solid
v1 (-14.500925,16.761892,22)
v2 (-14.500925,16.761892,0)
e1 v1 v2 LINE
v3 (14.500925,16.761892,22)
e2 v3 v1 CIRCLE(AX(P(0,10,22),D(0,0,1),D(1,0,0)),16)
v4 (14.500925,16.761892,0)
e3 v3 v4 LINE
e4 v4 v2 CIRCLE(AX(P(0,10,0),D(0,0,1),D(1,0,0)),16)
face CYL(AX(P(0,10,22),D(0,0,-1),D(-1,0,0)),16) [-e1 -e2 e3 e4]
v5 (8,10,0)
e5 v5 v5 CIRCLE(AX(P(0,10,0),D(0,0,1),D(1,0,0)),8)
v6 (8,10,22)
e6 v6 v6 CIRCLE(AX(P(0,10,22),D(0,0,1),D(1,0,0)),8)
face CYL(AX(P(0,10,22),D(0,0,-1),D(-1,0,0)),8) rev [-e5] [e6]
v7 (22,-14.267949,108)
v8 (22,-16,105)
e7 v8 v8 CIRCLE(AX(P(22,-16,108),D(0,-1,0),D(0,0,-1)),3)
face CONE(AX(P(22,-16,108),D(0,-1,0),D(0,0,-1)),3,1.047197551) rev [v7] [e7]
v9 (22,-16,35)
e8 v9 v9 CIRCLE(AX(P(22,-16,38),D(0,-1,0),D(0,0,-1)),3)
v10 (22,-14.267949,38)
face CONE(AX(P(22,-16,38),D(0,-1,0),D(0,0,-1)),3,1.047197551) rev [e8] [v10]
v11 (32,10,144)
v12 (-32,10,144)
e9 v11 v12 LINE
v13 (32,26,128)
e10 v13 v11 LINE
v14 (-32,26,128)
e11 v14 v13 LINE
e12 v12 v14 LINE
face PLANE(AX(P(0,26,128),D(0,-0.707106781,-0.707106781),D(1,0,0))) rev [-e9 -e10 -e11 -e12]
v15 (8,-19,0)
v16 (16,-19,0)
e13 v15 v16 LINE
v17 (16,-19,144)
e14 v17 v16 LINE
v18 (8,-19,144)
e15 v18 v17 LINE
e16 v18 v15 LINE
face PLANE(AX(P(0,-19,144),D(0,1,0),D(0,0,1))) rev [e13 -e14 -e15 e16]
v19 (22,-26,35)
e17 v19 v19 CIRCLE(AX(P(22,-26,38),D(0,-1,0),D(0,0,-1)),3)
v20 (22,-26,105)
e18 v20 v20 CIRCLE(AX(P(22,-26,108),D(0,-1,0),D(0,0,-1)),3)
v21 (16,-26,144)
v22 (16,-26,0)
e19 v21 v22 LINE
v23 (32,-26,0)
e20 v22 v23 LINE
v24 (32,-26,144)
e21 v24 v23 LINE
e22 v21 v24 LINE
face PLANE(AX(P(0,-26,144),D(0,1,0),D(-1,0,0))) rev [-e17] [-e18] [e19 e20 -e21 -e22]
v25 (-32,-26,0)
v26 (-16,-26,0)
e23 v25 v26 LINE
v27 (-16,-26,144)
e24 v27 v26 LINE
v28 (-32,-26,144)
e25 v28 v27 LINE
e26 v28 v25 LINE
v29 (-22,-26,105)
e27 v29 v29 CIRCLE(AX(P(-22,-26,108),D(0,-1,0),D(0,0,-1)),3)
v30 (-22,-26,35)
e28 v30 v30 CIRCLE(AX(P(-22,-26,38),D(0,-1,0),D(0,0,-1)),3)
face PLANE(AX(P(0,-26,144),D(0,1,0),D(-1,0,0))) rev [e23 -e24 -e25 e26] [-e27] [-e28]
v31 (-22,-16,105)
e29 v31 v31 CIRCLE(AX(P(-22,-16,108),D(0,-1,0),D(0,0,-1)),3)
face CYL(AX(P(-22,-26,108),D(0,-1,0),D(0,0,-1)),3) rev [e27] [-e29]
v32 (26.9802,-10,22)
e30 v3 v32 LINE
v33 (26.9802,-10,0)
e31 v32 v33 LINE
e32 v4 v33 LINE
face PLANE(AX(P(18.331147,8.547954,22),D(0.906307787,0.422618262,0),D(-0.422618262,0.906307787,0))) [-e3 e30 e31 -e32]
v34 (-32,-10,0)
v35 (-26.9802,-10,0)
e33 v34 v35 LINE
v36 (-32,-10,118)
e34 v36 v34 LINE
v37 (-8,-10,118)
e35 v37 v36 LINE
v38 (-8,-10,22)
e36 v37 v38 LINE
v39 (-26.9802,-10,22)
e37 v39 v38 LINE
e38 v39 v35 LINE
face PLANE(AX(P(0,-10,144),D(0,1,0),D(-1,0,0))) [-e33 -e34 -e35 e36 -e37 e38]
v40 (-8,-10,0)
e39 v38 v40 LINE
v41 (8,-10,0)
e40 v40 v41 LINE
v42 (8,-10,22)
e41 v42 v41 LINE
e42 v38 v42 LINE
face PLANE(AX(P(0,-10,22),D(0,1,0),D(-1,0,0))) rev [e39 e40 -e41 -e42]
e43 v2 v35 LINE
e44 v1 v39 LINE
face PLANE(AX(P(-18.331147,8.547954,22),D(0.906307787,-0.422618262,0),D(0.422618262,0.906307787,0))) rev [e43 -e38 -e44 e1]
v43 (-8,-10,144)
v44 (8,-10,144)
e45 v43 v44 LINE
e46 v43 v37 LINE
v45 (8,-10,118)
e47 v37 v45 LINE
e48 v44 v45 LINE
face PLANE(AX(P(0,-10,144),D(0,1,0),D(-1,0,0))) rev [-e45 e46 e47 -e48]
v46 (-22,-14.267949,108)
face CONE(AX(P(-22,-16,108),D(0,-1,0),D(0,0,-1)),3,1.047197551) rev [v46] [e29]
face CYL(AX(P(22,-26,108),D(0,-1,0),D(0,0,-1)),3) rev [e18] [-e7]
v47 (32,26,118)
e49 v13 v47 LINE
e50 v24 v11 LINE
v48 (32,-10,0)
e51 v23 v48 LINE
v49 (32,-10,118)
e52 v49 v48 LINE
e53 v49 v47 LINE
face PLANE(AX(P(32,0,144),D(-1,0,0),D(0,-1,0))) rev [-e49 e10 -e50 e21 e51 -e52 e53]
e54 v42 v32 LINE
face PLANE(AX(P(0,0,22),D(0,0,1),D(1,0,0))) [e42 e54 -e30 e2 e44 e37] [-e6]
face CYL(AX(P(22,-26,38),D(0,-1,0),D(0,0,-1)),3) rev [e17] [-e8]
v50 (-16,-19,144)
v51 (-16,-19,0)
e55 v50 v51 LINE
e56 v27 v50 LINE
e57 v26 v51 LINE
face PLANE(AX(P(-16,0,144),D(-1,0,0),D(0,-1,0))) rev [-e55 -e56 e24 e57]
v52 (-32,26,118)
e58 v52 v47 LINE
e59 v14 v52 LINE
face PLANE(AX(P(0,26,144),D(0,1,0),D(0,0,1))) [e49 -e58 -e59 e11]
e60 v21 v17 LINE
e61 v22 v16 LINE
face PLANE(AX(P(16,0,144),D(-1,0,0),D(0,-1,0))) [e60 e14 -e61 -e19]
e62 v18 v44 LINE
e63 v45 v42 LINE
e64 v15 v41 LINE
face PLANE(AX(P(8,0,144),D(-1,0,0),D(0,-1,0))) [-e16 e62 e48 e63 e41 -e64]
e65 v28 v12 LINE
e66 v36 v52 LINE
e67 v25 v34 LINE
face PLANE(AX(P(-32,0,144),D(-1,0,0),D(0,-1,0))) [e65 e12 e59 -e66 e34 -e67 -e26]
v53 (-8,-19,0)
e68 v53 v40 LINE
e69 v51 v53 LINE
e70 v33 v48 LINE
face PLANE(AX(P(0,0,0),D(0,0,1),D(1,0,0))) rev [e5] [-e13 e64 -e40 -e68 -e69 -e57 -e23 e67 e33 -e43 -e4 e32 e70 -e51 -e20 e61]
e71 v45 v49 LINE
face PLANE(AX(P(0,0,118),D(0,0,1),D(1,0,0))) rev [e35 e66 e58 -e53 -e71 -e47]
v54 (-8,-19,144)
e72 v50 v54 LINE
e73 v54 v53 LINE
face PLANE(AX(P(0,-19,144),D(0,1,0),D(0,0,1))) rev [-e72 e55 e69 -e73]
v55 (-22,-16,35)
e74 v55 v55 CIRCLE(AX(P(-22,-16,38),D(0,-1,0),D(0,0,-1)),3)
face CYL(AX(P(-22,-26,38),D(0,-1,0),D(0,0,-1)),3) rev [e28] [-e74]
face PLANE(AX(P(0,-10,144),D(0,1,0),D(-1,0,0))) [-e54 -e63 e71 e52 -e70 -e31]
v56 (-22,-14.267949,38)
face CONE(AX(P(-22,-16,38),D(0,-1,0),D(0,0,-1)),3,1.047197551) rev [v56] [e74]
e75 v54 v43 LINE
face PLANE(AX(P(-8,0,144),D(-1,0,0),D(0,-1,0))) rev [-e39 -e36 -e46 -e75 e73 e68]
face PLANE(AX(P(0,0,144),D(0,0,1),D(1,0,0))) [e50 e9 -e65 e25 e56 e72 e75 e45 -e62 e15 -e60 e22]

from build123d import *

# Parameters (mm, degrees)
BOSS_EXTRUDE2_DEPTH   = 144
BOSS_EXTRUDE2_2_DEPTH = 144
BOSS_EXTRUDE3_START   = 118
BOSS_EXTRUDE3_DEPTH   = 26
BOSS_EXTRUDE4_DEPTH   = 22
CHAMFER1_SIZE         = 16


# Read off the part's stored shape, not the designer's step: Ø2.0 (6) Diameter Hole1
with BuildPart() as part:
    # Sketch1 → Boss-Extrude2 (new body)
    with BuildSketch(Plane.XY):
        Polygon((26.980199866, -10), (8, -10), (8, -19), (16, -19), (16, -26), (32, -26), (32, -10), align=None)
    extrude(amount=BOSS_EXTRUDE2_DEPTH)



with BuildPart() as body_2:
    # Sketch1 → Boss-Extrude2 2 (new body)
    with BuildSketch(Plane.XY):
        Polygon((-32, -10), (-32, -26), (-16, -26), (-16, -19), (-8, -19), (-8, -10), (-26.980199866, -10), align=None)
    extrude(amount=BOSS_EXTRUDE2_2_DEPTH)


with BuildPart() as part_1:
    add(part.part)

    add(body_2.part)  # Boss-Extrude3 merges body 2
    # Sketch1<5> → Boss-Extrude3 (add)
    with BuildSketch(Plane.XY.offset(BOSS_EXTRUDE3_START)):
        Polygon((17.654046703, 10), (26.980199866, -10), (32, -10), (32, 10), align=None)
        with BuildLine():
            Line((32, 26), (-2.1e-08, 26))
            ThreePointArc((-2.1e-08, 26), (8.596793725, 23.494263139), (14.500924593, 16.761892188))
            Line((14.500924593, 16.761892188), (17.654046703, 10))
            Line((17.654046703, 10), (32, 10))
            Line((32, 10), (32, 26))
        make_face()
        with BuildLine():
            Line((-32, 26), (-32, 10))
            Line((-32, 10), (-17.654046703, 10))
            Line((-17.654046703, 10), (-14.500924593, 16.761892188))
            ThreePointArc((-14.500924593, 16.761892188), (-8.596793742, 23.494263127), (-2.1e-08, 26))
            Line((-2.1e-08, 26), (-32, 26))
        make_face()
        with BuildLine():
            Line((-14.500924593, 16.761892188), (-17.654046703, 10))
            Line((-17.654046703, 10), (-8, 10))
            ThreePointArc((-8, 10), (0, 18), (8, 10))
            Line((8, 10), (17.654046703, 10))
            Line((17.654046703, 10), (14.500924593, 16.761892188))
            ThreePointArc((14.500924593, 16.761892188), (8.596793725, 23.494263139), (-2.1e-08, 26))
            ThreePointArc((-2.1e-08, 26), (-8.596793742, 23.494263127), (-14.500924593, 16.761892188))
        make_face()
        with BuildLine():
            Line((-17.654046703, 10), (-26.980199866, -10))
            Line((-26.980199866, -10), (-8, -10))
            Line((-8, -10), (8, -10))
            Line((8, -10), (26.980199866, -10))
            Line((26.980199866, -10), (17.654046703, 10))
            Line((17.654046703, 10), (8, 10))
            ThreePointArc((8, 10), (0, 2), (-8, 10))
            Line((-8, 10), (-17.654046703, 10))
        make_face()
        with BuildLine():
            ThreePointArc((8, 10), (0, 18), (-8, 10))
            Line((-8, 10), (8, 10))
        make_face()
        with BuildLine():
            Line((8, 10), (-8, 10))
            ThreePointArc((-8, 10), (0, 2), (8, 10))
        make_face()
        Polygon((-32, 10), (-32, -10), (-26.980199866, -10), (-17.654046703, 10), align=None)
        Polygon((-32, -10), (-32, -26), (-16, -26), (-16, -19), (-8, -19), (-8, -10), (-26.980199866, -10), align=None)
        Polygon((26.980199866, -10), (8, -10), (8, -19), (16, -19), (16, -26), (32, -26), (32, -10), align=None)
    extrude(amount=BOSS_EXTRUDE3_DEPTH)

    # Sketch1<6> → Boss-Extrude4 (add)
    with BuildSketch(Plane.XY):
        with BuildLine():
            Line((-17.654046703, 10), (-26.980199866, -10))
            Line((-26.980199866, -10), (-8, -10))
            Line((-8, -10), (8, -10))
            Line((8, -10), (26.980199866, -10))
            Line((26.980199866, -10), (17.654046703, 10))
            Line((17.654046703, 10), (8, 10))
            ThreePointArc((8, 10), (0, 2), (-8, 10))
            Line((-8, 10), (-17.654046703, 10))
        make_face()
        with BuildLine():
            Line((-14.500924593, 16.761892188), (-17.654046703, 10))
            Line((-17.654046703, 10), (-8, 10))
            ThreePointArc((-8, 10), (0, 18), (8, 10))
            Line((8, 10), (17.654046703, 10))
            Line((17.654046703, 10), (14.500924593, 16.761892188))
            ThreePointArc((14.500924593, 16.761892188), (8.596793725, 23.494263139), (-2.1e-08, 26))
            ThreePointArc((-2.1e-08, 26), (-8.596793742, 23.494263127), (-14.500924593, 16.761892188))
        make_face()
    extrude(amount=BOSS_EXTRUDE4_DEPTH)

    # Chamfer1
    chamfer1_edges = [part_1.edges().sort_by_distance(p)[0] for p in [
        (0, 26, 144),
    ]]
    chamfer(chamfer1_edges, length=CHAMFER1_SIZE)

    # Ø2.0 (6) Diameter Hole1 outline → Ø2.0 (6) Diameter Hole1 (revolve, cut)
    with BuildSketch(Plane(origin=(-22, 0, 38), x_dir=(1, 0, 0), z_dir=(0, 0, 1))):
        Polygon((3, -16), (0, -14.267949192), (0, -26), (3, -26), align=None)
    revolve(axis=Axis((-22, 0, 38), (0, 1, 0)), mode=Mode.SUBTRACT)

    # 2.0 _6_ Diameter Hole1 2 outline → 2.0 _6_ Diameter Hole1 2 (revolve, cut)
    with BuildSketch(Plane(origin=(22, 0, 108), x_dir=(1, 0, 0), z_dir=(0, 0, 1))):
        Polygon((3, -16), (0, -14.267949192), (0, -26), (3, -26), align=None)
    revolve(axis=Axis((22, 0, 108), (0, 1, 0)), mode=Mode.SUBTRACT)

    # 2.0 _6_ Diameter Hole1 3 outline → 2.0 _6_ Diameter Hole1 3 (revolve, cut)
    with BuildSketch(Plane(origin=(-22, 0, 108), x_dir=(1, 0, 0), z_dir=(0, 0, 1))):
        Polygon((3, -16), (0, -14.267949192), (0, -26), (3, -26), align=None)
    revolve(axis=Axis((-22, 0, 108), (0, 1, 0)), mode=Mode.SUBTRACT)

    # 2.0 _6_ Diameter Hole1 4 outline → 2.0 _6_ Diameter Hole1 4 (revolve, cut)
    with BuildSketch(Plane(origin=(22, 0, 38), x_dir=(1, 0, 0), z_dir=(0, 0, 1))):
        Polygon((3, -16), (0, -14.267949192), (0, -26), (3, -26), align=None)
    revolve(axis=Axis((22, 0, 38), (0, 1, 0)), mode=Mode.SUBTRACT)


solid = part_1.part
